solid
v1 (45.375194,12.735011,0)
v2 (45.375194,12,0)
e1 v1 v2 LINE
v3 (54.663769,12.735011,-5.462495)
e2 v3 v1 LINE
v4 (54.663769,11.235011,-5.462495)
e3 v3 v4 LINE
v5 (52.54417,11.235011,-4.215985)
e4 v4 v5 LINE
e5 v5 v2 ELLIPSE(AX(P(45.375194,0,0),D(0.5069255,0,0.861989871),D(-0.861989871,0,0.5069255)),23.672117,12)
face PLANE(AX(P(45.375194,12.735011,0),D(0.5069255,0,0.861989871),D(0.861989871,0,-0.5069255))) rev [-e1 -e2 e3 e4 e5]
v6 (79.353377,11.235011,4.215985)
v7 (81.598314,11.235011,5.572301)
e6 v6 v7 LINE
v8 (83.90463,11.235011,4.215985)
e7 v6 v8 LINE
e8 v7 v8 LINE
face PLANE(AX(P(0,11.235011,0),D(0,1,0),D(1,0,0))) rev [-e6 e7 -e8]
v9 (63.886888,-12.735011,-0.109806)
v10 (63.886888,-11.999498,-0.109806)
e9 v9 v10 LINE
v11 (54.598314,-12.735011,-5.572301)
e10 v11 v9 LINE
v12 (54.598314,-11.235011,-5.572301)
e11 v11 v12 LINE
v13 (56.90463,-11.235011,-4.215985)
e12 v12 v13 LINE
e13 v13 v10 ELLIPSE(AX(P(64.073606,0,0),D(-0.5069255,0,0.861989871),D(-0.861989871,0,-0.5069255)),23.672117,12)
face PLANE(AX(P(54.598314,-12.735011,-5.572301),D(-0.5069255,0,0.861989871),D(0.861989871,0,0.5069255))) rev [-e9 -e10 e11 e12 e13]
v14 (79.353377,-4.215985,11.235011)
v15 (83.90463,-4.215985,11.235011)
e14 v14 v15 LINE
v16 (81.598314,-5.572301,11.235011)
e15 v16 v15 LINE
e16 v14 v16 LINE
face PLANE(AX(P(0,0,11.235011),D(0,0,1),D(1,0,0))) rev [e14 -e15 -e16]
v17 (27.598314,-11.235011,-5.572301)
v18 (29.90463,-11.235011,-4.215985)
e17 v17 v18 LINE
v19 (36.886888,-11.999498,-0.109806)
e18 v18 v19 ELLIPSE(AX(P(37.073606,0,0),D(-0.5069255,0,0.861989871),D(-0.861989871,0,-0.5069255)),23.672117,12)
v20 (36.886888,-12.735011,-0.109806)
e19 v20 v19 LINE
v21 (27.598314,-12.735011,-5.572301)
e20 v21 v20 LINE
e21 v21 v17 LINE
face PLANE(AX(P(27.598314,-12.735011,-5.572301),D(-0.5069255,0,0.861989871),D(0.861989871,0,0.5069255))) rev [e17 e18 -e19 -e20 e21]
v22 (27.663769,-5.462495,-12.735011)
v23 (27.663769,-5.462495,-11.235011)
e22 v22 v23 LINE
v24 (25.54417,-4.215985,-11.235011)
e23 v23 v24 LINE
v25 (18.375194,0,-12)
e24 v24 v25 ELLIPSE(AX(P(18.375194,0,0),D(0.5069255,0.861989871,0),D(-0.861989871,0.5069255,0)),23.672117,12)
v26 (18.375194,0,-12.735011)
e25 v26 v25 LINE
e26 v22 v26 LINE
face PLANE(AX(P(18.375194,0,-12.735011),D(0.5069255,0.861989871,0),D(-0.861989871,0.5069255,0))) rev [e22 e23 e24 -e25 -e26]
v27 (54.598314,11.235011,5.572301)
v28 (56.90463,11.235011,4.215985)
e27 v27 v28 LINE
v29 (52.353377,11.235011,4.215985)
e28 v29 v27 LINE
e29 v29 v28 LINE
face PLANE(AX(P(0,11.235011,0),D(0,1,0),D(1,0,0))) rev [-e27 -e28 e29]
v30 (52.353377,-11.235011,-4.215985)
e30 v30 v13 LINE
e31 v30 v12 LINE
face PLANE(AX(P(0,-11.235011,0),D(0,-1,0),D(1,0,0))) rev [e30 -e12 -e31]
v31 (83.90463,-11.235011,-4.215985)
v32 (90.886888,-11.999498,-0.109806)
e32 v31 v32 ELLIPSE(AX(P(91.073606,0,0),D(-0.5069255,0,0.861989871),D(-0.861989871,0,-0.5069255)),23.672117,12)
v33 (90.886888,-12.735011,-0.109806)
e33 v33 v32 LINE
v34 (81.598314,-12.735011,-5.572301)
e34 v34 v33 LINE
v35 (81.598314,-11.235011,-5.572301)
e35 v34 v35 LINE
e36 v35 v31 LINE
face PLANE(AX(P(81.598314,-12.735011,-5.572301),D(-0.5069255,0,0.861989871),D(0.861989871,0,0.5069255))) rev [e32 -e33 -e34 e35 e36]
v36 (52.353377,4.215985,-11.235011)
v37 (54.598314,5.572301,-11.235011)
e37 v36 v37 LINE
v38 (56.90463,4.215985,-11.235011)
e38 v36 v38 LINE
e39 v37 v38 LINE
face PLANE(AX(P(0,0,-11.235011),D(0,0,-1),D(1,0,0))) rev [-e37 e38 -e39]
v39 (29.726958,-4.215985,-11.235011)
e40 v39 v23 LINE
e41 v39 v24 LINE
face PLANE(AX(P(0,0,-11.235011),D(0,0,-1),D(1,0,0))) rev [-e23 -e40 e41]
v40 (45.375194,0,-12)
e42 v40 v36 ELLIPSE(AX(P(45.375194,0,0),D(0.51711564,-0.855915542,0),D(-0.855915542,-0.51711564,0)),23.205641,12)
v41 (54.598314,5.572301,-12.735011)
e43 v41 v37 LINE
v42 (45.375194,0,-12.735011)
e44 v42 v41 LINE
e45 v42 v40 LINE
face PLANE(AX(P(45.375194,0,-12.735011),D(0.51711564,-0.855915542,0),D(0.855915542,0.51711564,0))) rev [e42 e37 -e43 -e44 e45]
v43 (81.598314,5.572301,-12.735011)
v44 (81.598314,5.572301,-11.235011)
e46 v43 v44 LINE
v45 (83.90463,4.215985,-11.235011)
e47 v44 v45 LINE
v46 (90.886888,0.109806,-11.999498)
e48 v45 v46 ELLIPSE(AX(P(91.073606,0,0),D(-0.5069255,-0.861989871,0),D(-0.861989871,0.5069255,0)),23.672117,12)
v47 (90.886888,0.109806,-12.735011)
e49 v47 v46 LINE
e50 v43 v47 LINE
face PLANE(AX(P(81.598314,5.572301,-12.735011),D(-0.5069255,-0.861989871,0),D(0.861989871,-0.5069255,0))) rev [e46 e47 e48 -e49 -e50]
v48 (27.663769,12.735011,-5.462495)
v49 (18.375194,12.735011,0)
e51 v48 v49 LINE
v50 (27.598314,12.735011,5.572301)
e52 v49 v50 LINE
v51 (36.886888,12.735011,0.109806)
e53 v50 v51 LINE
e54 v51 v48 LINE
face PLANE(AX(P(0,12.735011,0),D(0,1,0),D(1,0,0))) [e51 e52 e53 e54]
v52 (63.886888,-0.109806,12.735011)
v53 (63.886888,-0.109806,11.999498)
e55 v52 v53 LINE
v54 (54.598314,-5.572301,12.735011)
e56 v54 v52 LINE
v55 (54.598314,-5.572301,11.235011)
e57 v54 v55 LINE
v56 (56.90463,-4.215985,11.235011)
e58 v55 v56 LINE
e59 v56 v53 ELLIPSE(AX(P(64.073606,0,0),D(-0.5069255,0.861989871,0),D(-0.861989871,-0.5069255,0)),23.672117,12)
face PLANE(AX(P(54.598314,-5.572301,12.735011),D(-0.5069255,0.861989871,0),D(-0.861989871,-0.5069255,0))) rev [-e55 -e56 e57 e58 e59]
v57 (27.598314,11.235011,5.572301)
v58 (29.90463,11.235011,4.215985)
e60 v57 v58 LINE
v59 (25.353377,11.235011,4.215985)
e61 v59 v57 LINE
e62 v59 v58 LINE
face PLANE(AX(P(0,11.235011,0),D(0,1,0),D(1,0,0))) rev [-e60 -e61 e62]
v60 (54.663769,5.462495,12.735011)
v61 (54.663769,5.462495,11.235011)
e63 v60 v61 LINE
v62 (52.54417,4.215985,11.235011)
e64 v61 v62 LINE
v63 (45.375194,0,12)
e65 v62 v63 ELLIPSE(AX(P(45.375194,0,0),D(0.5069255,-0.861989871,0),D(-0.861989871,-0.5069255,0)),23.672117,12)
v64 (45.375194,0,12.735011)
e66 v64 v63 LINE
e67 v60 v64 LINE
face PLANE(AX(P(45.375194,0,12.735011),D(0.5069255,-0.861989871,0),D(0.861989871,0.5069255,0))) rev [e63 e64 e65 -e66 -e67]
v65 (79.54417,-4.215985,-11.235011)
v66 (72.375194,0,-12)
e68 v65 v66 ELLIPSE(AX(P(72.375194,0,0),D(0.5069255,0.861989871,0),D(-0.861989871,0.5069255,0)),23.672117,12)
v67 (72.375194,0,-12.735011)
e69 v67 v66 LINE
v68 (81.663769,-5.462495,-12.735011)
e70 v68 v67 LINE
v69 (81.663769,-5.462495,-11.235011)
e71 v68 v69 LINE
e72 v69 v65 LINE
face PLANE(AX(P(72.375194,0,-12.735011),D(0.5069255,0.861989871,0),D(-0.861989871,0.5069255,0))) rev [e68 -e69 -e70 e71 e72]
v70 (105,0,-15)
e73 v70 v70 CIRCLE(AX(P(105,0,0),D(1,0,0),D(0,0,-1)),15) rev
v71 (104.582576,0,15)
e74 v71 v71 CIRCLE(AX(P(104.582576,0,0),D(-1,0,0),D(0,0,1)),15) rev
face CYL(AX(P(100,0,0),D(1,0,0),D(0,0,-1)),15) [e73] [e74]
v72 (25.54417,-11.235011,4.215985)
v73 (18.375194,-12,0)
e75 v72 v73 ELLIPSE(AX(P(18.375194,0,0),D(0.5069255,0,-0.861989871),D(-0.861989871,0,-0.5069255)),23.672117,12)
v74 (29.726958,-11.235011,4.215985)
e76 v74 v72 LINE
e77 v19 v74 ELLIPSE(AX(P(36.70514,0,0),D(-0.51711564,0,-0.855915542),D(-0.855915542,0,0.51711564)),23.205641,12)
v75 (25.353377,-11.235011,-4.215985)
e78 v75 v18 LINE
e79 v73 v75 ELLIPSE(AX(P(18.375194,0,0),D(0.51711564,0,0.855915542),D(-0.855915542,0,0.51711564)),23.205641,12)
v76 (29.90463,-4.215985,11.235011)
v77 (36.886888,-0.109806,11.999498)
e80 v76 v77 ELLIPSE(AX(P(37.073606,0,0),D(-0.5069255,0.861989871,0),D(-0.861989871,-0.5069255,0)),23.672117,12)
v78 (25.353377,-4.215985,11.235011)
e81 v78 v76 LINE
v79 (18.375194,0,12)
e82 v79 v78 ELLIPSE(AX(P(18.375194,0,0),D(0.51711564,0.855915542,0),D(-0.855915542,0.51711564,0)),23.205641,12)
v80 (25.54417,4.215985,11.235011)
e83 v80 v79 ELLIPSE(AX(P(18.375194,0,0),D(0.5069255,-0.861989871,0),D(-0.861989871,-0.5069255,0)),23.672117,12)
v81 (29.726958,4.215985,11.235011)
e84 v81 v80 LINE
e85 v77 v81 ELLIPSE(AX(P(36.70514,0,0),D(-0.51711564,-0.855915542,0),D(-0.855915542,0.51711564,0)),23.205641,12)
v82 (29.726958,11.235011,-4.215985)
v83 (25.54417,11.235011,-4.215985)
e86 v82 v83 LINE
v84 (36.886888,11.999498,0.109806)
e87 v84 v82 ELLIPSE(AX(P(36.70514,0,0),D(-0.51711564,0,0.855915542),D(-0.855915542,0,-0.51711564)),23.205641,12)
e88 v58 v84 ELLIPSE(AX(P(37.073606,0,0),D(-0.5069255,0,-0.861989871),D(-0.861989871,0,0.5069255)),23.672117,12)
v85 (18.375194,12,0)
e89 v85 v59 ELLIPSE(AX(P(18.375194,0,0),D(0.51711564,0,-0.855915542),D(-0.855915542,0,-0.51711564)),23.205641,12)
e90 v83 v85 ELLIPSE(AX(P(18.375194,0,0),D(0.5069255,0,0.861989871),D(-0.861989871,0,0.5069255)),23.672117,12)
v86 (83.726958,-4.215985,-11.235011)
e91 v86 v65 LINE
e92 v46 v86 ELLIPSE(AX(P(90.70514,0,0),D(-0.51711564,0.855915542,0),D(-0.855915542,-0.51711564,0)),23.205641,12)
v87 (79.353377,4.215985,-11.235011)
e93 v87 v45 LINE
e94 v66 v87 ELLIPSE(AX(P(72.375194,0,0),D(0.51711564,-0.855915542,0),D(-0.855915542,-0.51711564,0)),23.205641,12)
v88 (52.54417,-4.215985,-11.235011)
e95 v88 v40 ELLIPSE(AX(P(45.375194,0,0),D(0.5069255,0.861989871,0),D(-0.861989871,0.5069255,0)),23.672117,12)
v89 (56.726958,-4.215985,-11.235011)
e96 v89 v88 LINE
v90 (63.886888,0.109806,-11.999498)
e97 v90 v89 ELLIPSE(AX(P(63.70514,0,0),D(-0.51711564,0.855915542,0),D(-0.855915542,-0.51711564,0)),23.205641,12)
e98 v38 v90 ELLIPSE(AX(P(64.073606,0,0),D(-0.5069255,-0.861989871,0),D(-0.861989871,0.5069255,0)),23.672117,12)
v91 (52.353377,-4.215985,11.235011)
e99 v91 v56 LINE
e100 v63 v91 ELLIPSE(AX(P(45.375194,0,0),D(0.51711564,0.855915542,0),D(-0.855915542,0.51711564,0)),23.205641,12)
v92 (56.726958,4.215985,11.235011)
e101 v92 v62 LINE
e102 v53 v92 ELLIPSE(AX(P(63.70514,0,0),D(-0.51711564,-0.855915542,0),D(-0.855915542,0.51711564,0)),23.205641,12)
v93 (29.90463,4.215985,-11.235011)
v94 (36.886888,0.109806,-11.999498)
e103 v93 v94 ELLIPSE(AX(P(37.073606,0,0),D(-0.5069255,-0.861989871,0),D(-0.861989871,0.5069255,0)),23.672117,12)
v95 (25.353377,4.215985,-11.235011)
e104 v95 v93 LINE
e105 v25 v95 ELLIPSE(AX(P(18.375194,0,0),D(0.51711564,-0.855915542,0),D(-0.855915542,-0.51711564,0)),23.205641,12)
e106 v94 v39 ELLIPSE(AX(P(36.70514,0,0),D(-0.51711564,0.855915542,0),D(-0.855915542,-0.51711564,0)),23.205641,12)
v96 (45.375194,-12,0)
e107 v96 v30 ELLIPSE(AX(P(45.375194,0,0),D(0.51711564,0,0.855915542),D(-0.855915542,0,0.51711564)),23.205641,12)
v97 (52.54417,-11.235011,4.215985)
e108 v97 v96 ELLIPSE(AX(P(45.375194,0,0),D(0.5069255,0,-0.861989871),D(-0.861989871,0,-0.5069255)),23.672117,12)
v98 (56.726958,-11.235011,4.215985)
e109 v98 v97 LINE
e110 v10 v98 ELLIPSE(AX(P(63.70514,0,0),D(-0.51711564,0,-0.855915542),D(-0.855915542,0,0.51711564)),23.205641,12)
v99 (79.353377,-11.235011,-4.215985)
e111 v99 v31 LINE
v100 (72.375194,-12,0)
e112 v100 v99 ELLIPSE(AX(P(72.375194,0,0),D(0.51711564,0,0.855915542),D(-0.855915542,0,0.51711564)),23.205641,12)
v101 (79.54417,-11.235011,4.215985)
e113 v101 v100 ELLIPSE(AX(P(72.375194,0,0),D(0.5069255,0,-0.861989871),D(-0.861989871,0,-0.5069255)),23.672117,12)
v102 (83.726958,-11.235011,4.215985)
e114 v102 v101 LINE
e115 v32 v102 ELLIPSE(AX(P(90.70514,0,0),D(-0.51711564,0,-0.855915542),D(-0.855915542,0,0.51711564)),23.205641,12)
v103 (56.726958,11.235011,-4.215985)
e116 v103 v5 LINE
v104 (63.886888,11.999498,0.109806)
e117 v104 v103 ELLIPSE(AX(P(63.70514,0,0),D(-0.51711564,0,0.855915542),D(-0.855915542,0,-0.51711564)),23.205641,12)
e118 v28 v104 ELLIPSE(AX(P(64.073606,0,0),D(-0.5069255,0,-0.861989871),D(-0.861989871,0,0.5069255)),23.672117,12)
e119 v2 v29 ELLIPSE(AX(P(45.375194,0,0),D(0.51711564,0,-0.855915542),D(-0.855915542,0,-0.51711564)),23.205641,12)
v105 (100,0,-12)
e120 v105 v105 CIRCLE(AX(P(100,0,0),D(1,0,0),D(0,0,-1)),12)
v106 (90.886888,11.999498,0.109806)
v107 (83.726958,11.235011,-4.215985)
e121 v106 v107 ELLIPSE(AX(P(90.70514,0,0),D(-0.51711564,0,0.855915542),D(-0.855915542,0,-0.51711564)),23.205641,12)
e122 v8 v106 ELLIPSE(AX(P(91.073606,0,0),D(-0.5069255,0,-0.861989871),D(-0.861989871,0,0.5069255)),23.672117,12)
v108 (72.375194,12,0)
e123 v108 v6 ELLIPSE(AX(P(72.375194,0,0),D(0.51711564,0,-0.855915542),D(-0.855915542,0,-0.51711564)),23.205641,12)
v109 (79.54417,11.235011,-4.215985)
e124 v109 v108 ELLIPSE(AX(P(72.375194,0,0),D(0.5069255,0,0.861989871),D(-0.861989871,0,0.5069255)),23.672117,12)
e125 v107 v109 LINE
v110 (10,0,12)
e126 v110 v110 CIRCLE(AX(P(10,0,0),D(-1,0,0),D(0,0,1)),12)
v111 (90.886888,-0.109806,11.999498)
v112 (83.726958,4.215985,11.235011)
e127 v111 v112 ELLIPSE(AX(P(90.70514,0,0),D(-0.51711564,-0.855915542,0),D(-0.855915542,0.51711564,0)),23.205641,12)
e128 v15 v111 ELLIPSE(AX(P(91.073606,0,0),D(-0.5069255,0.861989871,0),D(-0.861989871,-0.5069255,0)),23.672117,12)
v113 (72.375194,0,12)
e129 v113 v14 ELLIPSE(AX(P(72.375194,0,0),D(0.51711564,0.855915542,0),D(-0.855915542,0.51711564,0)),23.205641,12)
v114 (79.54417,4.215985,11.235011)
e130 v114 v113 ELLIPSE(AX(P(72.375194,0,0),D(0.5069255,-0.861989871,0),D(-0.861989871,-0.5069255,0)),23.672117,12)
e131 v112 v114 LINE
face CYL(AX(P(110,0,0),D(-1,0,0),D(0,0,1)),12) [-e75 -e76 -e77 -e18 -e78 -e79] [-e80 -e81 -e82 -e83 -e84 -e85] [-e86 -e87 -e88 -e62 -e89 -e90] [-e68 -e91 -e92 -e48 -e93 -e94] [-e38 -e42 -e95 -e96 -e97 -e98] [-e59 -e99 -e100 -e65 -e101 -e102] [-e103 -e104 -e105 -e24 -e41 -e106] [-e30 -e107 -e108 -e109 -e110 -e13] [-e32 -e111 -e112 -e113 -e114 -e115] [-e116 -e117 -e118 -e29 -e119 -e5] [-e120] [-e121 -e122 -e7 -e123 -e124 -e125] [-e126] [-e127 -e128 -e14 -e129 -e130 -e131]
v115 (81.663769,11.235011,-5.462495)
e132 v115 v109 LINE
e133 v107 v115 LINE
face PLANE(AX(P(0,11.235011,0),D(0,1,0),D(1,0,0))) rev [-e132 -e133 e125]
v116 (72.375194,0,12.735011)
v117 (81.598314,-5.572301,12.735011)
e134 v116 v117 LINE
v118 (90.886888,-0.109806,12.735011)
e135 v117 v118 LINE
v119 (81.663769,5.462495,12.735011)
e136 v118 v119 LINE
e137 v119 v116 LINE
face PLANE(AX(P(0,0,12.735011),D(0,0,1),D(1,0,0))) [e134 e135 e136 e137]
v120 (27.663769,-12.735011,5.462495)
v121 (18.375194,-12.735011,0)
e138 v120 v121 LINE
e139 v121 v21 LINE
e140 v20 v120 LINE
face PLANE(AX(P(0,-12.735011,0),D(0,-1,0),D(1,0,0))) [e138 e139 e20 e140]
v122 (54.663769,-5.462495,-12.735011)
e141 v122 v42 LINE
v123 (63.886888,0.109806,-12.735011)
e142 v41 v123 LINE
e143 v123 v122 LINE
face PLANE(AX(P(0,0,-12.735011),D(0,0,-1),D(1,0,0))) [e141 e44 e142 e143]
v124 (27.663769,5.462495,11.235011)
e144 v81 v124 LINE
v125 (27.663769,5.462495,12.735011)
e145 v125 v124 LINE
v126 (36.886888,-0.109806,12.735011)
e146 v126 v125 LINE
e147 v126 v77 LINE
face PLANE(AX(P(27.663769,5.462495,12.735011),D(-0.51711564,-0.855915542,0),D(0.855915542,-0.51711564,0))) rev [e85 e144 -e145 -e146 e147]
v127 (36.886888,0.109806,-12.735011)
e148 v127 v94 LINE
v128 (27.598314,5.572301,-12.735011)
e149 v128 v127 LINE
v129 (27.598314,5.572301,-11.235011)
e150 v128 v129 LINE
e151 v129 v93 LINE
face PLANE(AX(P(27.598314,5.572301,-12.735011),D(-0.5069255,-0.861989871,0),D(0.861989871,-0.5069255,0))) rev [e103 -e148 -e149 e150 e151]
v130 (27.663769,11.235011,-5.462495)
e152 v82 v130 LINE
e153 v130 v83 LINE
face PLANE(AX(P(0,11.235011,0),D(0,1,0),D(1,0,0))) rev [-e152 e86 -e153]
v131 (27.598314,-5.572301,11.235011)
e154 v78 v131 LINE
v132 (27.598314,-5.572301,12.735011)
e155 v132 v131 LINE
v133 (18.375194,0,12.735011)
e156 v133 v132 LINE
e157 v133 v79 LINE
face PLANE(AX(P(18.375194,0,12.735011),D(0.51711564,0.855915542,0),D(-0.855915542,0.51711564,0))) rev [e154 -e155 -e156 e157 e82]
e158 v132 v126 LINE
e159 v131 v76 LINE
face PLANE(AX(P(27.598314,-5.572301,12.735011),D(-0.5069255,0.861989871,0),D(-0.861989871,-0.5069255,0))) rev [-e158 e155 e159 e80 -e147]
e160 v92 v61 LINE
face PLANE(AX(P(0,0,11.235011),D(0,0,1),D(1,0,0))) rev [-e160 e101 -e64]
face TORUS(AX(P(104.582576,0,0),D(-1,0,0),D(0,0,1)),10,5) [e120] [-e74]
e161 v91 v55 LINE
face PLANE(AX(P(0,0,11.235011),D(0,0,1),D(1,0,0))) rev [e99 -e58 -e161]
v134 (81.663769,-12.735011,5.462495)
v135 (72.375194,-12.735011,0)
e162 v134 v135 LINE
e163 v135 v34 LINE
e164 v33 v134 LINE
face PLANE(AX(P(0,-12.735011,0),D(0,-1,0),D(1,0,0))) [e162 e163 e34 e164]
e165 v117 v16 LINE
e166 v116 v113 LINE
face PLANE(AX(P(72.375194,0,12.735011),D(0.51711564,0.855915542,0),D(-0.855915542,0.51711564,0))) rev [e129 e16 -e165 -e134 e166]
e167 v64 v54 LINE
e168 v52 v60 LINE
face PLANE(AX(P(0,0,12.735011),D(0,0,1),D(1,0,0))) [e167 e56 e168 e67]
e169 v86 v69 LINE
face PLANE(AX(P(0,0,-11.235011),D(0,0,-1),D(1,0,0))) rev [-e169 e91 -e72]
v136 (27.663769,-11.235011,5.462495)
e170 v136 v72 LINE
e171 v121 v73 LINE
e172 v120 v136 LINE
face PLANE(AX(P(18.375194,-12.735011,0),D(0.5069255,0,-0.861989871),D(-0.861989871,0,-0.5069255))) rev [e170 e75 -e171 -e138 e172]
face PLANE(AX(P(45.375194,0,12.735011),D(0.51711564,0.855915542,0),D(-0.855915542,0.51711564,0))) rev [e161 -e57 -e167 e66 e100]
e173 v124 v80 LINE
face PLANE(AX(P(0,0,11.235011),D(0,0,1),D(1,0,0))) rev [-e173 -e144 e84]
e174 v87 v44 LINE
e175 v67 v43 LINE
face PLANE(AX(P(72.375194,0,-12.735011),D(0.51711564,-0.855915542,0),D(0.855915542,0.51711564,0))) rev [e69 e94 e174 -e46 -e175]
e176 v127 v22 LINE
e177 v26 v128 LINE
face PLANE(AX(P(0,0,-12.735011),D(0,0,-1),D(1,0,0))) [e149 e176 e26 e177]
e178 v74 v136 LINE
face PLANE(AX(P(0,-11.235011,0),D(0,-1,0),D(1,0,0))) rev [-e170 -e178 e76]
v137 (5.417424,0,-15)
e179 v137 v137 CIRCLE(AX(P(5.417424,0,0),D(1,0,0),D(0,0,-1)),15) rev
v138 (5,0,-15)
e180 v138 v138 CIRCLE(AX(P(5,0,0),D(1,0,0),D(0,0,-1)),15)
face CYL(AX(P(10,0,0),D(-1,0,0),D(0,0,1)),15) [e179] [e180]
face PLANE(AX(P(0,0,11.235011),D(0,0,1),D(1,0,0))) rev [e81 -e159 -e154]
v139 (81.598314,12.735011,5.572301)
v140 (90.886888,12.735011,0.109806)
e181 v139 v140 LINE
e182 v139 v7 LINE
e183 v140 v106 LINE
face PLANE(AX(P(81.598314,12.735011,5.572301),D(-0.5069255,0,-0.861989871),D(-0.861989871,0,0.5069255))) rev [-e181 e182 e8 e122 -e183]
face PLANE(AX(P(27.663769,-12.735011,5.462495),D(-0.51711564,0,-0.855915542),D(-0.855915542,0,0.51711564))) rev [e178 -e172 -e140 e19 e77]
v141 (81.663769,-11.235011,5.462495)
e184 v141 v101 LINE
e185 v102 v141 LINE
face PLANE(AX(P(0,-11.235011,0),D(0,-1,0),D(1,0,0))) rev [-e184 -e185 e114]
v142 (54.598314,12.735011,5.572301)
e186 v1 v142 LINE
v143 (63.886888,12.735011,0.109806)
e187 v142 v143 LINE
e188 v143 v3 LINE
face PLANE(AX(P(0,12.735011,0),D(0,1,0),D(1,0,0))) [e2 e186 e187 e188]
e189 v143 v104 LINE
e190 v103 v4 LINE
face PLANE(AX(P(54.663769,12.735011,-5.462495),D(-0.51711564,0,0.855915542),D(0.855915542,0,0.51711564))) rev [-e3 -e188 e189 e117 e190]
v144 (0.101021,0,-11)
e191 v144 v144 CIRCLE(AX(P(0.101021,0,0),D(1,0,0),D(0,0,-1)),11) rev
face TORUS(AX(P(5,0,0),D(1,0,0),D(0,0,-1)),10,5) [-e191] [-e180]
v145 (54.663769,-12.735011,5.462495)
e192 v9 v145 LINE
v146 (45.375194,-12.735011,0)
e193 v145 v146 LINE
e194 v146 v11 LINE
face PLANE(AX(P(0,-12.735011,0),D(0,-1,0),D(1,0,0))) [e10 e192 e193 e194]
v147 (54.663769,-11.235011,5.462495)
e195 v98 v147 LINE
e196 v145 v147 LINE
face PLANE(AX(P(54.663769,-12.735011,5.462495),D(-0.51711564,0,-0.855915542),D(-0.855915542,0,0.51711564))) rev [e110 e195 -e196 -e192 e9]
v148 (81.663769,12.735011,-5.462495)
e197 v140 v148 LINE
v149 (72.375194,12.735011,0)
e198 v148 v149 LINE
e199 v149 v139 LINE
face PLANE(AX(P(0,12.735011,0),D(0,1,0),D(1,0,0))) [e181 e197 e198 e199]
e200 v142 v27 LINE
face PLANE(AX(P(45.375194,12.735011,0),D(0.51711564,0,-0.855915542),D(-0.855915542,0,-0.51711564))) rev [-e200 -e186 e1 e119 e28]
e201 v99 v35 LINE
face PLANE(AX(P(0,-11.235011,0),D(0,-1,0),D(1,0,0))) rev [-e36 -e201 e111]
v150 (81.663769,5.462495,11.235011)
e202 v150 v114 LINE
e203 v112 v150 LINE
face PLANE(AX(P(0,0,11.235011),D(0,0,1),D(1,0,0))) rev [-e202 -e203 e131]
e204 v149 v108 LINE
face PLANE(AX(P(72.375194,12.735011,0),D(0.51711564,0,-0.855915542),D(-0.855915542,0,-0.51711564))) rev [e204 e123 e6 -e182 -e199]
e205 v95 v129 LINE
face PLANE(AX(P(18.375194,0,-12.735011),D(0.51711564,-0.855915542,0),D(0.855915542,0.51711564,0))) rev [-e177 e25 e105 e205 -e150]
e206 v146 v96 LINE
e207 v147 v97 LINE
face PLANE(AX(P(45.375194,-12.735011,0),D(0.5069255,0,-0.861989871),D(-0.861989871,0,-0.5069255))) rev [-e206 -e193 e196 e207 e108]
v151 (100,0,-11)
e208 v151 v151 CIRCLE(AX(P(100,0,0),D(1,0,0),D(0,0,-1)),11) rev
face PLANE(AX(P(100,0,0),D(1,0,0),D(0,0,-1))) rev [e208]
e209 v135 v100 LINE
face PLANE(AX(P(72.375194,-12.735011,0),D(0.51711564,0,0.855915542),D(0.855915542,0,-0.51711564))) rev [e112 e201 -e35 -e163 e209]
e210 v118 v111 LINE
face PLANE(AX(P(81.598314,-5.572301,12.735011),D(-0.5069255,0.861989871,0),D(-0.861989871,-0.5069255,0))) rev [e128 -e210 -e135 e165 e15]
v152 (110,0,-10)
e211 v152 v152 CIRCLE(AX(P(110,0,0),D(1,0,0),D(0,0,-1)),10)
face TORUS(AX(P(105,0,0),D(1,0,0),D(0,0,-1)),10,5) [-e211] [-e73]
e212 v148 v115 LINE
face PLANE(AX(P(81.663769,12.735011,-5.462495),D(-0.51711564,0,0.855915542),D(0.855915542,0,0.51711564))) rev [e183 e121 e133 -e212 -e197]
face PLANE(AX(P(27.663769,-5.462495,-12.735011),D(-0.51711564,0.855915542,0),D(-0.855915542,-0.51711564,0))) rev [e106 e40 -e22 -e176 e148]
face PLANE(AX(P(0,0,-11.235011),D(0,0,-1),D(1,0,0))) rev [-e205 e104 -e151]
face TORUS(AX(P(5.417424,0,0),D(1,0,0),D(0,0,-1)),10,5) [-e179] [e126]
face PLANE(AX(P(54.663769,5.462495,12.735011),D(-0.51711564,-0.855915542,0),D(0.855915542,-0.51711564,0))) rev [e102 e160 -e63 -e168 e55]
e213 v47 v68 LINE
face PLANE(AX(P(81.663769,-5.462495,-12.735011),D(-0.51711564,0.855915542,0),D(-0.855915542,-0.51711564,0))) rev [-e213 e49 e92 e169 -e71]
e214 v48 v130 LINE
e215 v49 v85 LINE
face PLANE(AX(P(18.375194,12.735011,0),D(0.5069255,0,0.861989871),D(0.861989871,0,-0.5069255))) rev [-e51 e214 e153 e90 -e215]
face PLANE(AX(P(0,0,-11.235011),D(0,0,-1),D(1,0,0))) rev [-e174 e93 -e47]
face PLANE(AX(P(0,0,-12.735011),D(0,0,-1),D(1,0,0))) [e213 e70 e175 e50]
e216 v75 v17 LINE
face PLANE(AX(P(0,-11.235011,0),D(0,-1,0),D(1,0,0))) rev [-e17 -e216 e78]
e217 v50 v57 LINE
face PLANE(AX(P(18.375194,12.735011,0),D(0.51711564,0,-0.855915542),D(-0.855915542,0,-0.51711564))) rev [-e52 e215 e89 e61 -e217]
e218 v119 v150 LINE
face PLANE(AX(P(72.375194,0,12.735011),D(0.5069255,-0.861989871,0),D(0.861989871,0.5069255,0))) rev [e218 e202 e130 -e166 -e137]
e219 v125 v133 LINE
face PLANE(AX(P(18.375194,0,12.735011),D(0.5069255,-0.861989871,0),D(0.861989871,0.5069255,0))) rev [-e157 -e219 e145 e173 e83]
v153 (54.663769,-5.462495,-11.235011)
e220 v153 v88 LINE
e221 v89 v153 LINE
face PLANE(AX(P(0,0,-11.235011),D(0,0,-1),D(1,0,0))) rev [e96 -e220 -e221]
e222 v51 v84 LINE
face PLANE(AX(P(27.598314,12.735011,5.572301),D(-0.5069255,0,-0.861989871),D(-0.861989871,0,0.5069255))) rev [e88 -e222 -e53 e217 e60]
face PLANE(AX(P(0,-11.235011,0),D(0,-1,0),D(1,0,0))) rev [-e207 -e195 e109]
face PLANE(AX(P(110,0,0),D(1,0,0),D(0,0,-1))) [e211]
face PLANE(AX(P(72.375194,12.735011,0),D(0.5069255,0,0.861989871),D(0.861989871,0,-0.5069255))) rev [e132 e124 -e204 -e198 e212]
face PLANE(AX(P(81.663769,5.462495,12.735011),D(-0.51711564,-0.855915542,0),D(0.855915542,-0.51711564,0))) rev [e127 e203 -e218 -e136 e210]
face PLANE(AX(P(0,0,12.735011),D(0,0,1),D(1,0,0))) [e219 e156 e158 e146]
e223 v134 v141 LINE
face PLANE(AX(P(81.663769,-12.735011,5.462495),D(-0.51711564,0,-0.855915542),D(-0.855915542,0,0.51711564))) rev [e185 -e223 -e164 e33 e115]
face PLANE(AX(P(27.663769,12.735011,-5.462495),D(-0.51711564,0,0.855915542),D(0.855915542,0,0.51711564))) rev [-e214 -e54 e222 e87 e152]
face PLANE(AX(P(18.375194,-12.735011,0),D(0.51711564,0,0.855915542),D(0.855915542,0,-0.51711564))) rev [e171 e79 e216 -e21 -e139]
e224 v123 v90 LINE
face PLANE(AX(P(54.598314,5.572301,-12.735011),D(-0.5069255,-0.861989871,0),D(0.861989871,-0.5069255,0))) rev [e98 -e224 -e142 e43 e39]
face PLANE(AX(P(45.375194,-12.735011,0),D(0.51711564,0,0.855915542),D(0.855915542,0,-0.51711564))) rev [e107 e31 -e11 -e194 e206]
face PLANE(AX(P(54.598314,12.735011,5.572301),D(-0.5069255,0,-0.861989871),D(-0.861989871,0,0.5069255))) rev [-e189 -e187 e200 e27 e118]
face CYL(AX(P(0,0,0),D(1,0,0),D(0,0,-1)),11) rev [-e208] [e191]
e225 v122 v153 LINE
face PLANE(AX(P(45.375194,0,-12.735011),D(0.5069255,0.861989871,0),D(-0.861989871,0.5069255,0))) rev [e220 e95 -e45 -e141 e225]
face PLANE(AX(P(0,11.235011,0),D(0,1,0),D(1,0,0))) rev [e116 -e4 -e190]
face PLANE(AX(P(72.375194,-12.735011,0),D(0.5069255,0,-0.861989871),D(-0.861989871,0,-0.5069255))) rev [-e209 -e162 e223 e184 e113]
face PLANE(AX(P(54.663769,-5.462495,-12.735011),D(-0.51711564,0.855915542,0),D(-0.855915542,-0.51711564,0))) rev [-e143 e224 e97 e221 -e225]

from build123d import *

# Parameters (mm, degrees)
CROQUIS1_R              = 12
SALIENTE_EXTRUIR1_DEPTH = 110
CROQUIS3_R              = 11
CORTAR_EXTRUIR1_DEPTH   = 110
CROQUIS4_R              = 15
SALIENTE_EXTRUIR3_DEPTH = 10
REDONDEO1_R             = 5
SALIENTE_EXTRUIR4_START = -10
CROQUIS5_R              = 15
SALIENTE_EXTRUIR4_DEPTH = 10
REDONDEO2_R             = 5
CORTAR_EXTRUIR2_START   = -100
CROQUIS7_R              = 11
CORTAR_EXTRUIR2_DEPTH   = 100
SALIENTE_EXTRUIR5_DEPTH = 0.75
MATRIZC1_COUNT          = 4


with BuildPart() as part:
    # Croquis1 → Saliente-Extruir1 (new body)
    with BuildSketch(Plane(origin=(0, 0, 0), x_dir=(0, 0, -1), z_dir=(1, 0, 0))):
        Circle(CROQUIS1_R)
    extrude(amount=SALIENTE_EXTRUIR1_DEPTH)

    # Croquis3 → Cortar-Extruir1 (cut)
    with BuildSketch(Plane(origin=(110, 0, 0), x_dir=(0, 0, -1), z_dir=(1, 0, 0))):
        Circle(CROQUIS3_R)
    extrude(amount=-CORTAR_EXTRUIR1_DEPTH, mode=Mode.SUBTRACT)

    # Croquis4 → Saliente-Extruir3 (add)
    with BuildSketch(Plane(origin=(110, 0, 0), x_dir=(0, 0, -1), z_dir=(1, 0, 0))):
        Circle(CROQUIS4_R)
    extrude(amount=-SALIENTE_EXTRUIR3_DEPTH)

    # Redondeo1
    # the kernel refuses this fillet: 5 mm, written as the material it takes off along each edge
    with BuildSketch(Plane(origin=(110, 0, 0), x_dir=(0, 0, -1), z_dir=(0, -1, 0))) as redondeo1_piece_1:
        with BuildLine():
            CenterArc((15 - REDONDEO1_R, -REDONDEO1_R), REDONDEO1_R, 0, 90)
            Line((15 - REDONDEO1_R, 0), (15 - REDONDEO1_R, REDONDEO1_R * 0.02))
            Line((15 - REDONDEO1_R, REDONDEO1_R * 0.02), (15 + REDONDEO1_R * 0.02, REDONDEO1_R * 0.02))
            Line((15 + REDONDEO1_R * 0.02, REDONDEO1_R * 0.02), (15 + REDONDEO1_R * 0.02, -REDONDEO1_R))
            Line((15 + REDONDEO1_R * 0.02, -REDONDEO1_R), (15, -REDONDEO1_R))
        make_face()
    revolve(axis=Axis((110, 0, 0), (1, 0, 0)), mode=Mode.SUBTRACT)
    with BuildSketch(Plane(origin=(100, 0, 0), x_dir=(0, 0, -1), z_dir=(0, -1, 0))) as redondeo1_piece_2:
        with BuildLine():
            CenterArc((10, 4.582575695), REDONDEO1_R, 293.578178478, 66.421821522)
            Line((15, 4.582575695), (15.1, 4.582575695))
            Line((15.1, 4.582575695), (15.1, 0))
            Line((15.1, 0), (15, -0.1))
            ThreePointArc((15, -0.1), (13.5, -0.1), (12.04, -0.091651514))
            Line((12.04, -0.091651514), (12, 0))
        make_face()
    revolve(axis=Axis((100, 0, 0), (1, 0, 0)), mode=Mode.SUBTRACT)

    # Croquis5 → Saliente-Extruir4 (add)
    with BuildSketch(Plane.ZY.offset(SALIENTE_EXTRUIR4_START)):
        with Locations(Location((0, 0, 0), (0, 0, 180))):
            Circle(CROQUIS5_R)
    extrude(amount=SALIENTE_EXTRUIR4_DEPTH)

    # Redondeo2
    # the kernel refuses this fillet: 5 mm, written as the material it takes off along each edge
    with BuildSketch(Plane(origin=(0, 0, 0), x_dir=(0, 0, -1), z_dir=(0, 1, 0))) as redondeo2_piece_1:
        with BuildLine():
            CenterArc((15 - REDONDEO2_R, -REDONDEO2_R), REDONDEO2_R, 0, 90)
            Line((15, -REDONDEO2_R), (15 + REDONDEO2_R * 0.02, -REDONDEO2_R))
            Line((15 + REDONDEO2_R * 0.02, -REDONDEO2_R), (15 + REDONDEO2_R * 0.02, REDONDEO2_R * 0.02))
            Line((15 + REDONDEO2_R * 0.02, REDONDEO2_R * 0.02), (15 - REDONDEO2_R, REDONDEO2_R * 0.02))
            Line((15 - REDONDEO2_R, REDONDEO2_R * 0.02), (15 - REDONDEO2_R, 0))
        make_face()
    revolve(axis=Axis((0, 0, 0), (-1, 0, 0)), mode=Mode.SUBTRACT)
    with BuildSketch(Plane(origin=(10, 0, 0), x_dir=(0, 0, -1), z_dir=(0, 1, 0))) as redondeo2_piece_2:
        with BuildLine():
            CenterArc((10, 4.582575695), REDONDEO2_R, 293.578178478, 66.421821522)
            Line((12, 0), (12.04, -0.091651514))
            ThreePointArc((12.04, -0.091651514), (13.5, -0.1), (15, -0.1))
            Line((15, -0.1), (15.1, 0))
            Line((15.1, 0), (15.1, 4.582575695))
            Line((15.1, 4.582575695), (15, 4.582575695))
        make_face()
    revolve(axis=Axis((10, 0, 0), (-1, 0, 0)), mode=Mode.SUBTRACT)

    # Croquis7 → Cortar-Extruir2 (cut)
    with BuildSketch(Plane.ZY.offset(CORTAR_EXTRUIR2_START)):
        with Locations(Location((0, 0, 0), (0, 0, 180))):
            Circle(CROQUIS7_R)
    extrude(amount=CORTAR_EXTRUIR2_DEPTH, mode=Mode.SUBTRACT)

    # Croquis9 → Saliente-Extruir5 (add, symmetric)
    with BuildSketch(Plane.XY.offset(11.985010852)):
        Polygon((18.375194252, 0), (27.66376902, 5.462495064), (36.886888429, -0.109806246), (27.598313662, -5.57230131), align=None)
        Polygon((45.375194252, 0), (54.66376902, 5.462495064), (63.886888429, -0.109806246), (54.598313662, -5.57230131), align=None)
        Polygon((72.375194252, 0), (81.66376902, 5.462495064), (90.886888429, -0.109806246), (81.598313662, -5.57230131), align=None)
    saliente_extruir5 = extrude(amount=SALIENTE_EXTRUIR5_DEPTH, both=True)

    # MatrizC1: Saliente-Extruir5 ×4 about axis
    matrizc1_axis = Axis((0, 0, 0), (1, 0, 0))
    for i in range(1, MATRIZC1_COUNT):
        add(saliente_extruir5.rotate(matrizc1_axis, i * 360 / MATRIZC1_COUNT))


solid = part.part
